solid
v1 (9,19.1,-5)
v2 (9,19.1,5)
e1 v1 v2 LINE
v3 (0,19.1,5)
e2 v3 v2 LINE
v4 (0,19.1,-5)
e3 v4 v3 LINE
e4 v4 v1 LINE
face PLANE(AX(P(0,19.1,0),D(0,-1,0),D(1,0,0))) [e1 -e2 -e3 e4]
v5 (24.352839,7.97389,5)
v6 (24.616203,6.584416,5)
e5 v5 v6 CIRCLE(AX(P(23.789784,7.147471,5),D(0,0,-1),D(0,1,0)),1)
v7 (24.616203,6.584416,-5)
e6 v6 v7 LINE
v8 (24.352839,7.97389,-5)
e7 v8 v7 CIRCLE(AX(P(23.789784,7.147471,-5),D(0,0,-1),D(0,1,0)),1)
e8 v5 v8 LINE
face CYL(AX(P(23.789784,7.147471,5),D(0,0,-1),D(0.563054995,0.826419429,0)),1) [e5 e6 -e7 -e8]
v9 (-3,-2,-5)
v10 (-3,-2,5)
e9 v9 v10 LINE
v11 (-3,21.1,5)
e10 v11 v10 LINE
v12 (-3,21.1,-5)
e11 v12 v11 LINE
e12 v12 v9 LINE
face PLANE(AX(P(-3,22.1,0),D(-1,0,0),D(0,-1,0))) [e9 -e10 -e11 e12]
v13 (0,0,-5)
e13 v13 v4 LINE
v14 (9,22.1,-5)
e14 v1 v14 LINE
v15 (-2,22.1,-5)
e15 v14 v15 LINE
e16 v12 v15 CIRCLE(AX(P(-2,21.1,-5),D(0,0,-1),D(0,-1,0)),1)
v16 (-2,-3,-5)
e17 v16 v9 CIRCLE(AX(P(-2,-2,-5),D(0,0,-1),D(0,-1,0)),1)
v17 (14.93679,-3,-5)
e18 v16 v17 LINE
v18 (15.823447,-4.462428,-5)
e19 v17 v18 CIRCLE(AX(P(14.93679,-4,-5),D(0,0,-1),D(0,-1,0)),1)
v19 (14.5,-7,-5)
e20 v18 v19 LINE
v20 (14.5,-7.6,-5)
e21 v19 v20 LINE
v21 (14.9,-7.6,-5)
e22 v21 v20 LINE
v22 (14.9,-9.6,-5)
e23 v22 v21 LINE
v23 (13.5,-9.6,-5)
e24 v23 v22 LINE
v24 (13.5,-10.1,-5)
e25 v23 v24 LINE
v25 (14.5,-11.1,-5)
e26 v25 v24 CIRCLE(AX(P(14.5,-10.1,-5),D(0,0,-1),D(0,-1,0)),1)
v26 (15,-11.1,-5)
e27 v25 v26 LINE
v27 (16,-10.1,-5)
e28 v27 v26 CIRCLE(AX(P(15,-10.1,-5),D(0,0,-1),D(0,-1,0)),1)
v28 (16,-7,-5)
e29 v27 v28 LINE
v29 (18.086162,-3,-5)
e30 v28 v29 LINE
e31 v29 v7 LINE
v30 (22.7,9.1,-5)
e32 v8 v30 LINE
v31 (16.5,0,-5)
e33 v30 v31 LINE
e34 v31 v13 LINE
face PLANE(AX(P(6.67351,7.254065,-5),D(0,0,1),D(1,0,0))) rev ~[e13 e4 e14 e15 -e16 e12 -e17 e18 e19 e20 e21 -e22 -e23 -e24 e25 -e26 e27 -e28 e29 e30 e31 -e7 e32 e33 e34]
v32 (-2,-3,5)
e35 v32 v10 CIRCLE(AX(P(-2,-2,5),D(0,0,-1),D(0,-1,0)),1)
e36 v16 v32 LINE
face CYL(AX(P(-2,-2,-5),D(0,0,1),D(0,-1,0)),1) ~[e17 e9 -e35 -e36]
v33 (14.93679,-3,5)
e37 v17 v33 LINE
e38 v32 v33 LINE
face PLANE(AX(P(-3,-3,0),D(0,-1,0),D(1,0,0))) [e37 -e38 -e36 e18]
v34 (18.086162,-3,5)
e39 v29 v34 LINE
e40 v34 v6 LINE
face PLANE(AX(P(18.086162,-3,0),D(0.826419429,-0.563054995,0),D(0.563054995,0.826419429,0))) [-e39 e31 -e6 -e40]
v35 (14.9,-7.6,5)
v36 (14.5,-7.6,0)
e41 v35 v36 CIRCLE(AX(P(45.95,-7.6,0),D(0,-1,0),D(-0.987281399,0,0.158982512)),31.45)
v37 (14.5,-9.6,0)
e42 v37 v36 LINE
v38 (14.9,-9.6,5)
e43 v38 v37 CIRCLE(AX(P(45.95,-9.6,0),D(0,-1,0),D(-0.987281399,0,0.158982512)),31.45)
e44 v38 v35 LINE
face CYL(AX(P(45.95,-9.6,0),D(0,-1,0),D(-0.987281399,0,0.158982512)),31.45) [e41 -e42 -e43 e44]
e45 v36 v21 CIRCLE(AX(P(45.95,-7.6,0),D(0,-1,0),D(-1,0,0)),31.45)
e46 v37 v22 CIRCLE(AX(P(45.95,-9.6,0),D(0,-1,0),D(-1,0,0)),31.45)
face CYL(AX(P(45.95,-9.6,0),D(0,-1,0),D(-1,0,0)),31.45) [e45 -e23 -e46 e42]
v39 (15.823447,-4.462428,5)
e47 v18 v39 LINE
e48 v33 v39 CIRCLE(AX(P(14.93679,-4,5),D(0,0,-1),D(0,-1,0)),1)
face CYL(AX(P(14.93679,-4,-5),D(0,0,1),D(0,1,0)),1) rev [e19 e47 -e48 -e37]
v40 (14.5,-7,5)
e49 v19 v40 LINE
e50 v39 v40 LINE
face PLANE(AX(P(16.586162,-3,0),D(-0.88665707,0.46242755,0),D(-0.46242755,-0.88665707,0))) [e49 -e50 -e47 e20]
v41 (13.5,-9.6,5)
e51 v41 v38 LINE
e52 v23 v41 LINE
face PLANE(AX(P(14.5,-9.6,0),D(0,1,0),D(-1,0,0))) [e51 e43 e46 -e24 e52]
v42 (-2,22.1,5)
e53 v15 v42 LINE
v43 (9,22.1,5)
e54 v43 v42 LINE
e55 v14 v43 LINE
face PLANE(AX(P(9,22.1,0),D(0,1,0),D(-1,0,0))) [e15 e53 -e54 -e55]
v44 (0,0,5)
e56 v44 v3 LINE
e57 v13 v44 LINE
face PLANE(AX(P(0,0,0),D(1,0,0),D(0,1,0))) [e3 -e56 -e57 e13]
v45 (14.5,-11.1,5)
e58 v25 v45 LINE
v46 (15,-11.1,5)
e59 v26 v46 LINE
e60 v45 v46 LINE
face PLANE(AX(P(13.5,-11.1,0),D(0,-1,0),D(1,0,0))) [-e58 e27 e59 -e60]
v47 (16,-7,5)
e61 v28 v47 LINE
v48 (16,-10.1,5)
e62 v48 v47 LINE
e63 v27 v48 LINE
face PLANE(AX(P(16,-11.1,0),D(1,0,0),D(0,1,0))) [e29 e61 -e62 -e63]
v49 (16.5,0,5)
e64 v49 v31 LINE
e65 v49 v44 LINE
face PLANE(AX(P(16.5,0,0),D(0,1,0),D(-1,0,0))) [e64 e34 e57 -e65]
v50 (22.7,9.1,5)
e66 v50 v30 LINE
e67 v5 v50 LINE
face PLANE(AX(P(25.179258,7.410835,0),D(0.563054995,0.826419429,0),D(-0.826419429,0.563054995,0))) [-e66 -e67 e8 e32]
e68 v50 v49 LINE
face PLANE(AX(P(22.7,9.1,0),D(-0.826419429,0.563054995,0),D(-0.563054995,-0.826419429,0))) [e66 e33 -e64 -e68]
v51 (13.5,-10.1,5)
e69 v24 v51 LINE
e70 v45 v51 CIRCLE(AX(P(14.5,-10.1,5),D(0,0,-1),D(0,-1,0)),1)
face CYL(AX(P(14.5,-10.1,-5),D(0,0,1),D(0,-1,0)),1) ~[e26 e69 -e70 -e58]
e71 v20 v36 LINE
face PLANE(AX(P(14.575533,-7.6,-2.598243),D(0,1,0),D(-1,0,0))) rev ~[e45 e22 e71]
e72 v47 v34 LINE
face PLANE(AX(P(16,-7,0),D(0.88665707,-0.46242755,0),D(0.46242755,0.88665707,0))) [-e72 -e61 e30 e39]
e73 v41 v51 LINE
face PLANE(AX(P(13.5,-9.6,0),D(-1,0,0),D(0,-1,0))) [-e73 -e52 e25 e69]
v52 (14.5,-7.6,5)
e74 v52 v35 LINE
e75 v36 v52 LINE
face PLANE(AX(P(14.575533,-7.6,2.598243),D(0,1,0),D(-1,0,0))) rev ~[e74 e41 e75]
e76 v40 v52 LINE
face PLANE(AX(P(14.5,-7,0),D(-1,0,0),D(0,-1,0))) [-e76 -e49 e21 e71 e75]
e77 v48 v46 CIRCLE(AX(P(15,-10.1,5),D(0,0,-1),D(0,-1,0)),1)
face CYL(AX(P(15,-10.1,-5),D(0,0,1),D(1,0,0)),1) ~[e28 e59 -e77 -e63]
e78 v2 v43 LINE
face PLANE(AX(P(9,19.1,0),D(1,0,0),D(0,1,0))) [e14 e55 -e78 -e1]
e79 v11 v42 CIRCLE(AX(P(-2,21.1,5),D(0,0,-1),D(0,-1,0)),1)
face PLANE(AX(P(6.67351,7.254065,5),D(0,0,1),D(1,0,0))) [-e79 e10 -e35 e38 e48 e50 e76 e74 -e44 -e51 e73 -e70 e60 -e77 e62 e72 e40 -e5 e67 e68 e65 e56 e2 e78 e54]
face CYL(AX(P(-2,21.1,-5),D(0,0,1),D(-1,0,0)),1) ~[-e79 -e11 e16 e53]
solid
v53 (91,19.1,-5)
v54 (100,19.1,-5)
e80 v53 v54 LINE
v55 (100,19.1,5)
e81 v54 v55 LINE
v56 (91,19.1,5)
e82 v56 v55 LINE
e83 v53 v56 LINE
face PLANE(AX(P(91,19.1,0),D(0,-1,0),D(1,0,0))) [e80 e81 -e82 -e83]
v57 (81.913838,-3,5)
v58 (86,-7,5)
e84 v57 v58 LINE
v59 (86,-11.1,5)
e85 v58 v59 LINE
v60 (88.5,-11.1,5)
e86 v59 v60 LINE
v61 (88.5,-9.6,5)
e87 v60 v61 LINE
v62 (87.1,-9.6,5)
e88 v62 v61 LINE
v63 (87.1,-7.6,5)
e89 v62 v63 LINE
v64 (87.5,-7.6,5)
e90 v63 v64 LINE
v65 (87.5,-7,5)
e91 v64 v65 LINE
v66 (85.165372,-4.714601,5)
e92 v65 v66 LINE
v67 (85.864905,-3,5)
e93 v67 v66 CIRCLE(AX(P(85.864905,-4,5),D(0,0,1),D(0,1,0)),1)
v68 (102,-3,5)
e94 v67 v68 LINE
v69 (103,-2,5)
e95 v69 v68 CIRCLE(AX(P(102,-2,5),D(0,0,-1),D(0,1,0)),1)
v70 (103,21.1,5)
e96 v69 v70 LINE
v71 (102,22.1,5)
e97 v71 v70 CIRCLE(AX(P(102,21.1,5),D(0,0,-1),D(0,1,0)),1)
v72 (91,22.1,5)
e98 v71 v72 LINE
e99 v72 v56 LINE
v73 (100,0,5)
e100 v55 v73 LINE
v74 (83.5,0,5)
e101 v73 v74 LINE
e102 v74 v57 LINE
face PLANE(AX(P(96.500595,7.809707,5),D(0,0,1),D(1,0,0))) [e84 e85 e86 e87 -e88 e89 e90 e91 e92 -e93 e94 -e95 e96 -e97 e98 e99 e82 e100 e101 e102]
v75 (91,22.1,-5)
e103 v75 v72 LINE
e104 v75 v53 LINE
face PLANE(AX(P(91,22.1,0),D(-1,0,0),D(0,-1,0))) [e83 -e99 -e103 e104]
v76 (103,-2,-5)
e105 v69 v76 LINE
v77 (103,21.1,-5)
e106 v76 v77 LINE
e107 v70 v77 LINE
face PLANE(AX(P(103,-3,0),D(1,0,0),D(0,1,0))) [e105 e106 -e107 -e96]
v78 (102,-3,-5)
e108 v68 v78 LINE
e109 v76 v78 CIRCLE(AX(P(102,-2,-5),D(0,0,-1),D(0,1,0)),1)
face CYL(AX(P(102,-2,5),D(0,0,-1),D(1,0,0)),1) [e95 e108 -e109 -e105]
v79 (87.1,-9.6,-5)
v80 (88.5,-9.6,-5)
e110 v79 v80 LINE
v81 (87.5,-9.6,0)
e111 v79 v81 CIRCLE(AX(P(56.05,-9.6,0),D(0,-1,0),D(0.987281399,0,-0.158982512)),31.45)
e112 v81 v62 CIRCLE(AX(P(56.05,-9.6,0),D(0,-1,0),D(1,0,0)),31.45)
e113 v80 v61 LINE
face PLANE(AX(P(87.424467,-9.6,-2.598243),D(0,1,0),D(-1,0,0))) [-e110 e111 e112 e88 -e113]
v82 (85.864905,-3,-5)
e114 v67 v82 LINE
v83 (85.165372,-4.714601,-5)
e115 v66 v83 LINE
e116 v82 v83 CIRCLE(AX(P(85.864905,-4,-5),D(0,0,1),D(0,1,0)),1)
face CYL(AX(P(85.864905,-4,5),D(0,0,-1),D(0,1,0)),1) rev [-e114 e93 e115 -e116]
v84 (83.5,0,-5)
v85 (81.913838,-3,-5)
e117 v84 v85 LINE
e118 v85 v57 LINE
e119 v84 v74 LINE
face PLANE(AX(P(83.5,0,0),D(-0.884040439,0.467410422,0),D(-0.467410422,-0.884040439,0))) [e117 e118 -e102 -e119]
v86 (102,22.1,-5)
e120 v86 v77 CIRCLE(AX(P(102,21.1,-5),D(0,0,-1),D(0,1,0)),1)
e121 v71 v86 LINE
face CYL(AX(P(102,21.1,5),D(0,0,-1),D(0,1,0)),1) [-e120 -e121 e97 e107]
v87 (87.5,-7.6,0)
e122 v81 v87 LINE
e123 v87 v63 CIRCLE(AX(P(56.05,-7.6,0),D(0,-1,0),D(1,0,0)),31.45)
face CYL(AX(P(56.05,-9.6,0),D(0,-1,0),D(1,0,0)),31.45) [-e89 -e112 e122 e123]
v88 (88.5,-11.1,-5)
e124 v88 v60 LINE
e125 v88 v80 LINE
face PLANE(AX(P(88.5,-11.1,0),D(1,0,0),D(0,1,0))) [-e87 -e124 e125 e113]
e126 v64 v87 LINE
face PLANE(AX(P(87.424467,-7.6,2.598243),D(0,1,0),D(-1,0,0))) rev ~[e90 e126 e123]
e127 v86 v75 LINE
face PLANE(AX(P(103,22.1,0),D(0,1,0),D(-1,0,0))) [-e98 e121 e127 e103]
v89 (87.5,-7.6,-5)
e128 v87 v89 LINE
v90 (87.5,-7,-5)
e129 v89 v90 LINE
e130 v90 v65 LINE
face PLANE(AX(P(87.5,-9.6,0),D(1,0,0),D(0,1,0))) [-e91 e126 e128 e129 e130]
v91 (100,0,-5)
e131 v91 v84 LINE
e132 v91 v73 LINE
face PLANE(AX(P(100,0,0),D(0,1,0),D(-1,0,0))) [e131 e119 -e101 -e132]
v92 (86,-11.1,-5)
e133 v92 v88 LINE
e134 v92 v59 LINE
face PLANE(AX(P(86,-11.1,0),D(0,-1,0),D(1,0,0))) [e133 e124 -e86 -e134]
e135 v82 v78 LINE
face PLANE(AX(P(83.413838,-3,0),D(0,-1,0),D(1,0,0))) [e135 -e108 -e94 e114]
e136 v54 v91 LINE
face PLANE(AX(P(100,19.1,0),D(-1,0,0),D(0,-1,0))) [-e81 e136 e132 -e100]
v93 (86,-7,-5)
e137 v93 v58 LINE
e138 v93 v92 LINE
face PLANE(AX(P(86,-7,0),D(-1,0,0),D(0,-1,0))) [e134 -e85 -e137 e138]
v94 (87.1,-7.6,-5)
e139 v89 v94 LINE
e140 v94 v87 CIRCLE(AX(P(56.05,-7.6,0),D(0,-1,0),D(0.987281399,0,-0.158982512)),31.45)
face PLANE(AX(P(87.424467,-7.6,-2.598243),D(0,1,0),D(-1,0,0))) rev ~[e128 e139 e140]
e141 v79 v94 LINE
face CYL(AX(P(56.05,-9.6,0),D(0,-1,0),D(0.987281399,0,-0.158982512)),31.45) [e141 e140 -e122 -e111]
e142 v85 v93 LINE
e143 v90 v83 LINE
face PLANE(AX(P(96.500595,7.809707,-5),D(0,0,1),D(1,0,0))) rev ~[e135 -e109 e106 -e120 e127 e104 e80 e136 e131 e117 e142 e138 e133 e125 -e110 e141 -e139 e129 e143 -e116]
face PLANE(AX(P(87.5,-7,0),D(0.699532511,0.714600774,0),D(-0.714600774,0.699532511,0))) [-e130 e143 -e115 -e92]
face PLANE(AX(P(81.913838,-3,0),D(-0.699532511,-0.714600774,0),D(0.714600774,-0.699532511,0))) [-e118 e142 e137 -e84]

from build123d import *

# Parameters (mm, degrees)
F1_DEPTH = 5
F3_R     = 1
F3_2_R   = 1
F4_R     = 1
F4_2_R   = 1
F6_DEPTH = 2
F8_DEPTH = 2


# Not quite as in the source:
# - a feature names something its author has since deleted; it is built from what else it names


with BuildPart() as f1:
    # F0 (on Top) → F1 (new body, symmetric)
    with BuildSketch(Plane.XY):
        Polygon((103, 22.1), (91, 22.1), (91, 19.1), (100, 19.1), (100, 0), (83.5, 0), (81.9138380969, -3), (83.4138380969, -3), (103, -3), align=None)
        Polygon((87.5, -7), (83.4138380969, -3), (81.9138380969, -3), (86, -7), (86, -11.1), (88.5, -11.1), (88.5, -9.6), (87.5, -9.6), align=None)
    extrude(amount=F1_DEPTH, both=True)

    # F3
    f3_edges = [f1.edges().sort_by_distance(p)[0] for p in [
        (103, 22.1, 0),
        (103, -3, 0),
    ]]
    fillet(f3_edges, radius=F3_R)

    # F4
    f4_edges = [f1.edges().sort_by_distance(p)[0] for p in [
        (83.413838, -3, 0),
    ]]
    fillet(f4_edges, radius=F4_R)

    # F7 (on face) → F8 (cut)
    with BuildSketch(Plane(origin=(0, -9.6, 0), x_dir=(-1, 0, 0), z_dir=(0, 1, 0))):
        with BuildLine():
            ThreePointArc((-87.5, 0), (-87.39984051, 2.5079872408), (-87.1, 5))
            Line((-87.1, 5), (-87.5, 5))
            Line((-87.5, 5), (-87.5, 0))
        make_face()
        with BuildLine():
            ThreePointArc((-87.1, -5), (-87.39984051, -2.5079872408), (-87.5, 0))
            Line((-87.5, 0), (-87.5, -5))
            Line((-87.5, -5), (-87.1, -5))
        make_face()
    extrude(amount=F8_DEPTH, mode=Mode.SUBTRACT)


with BuildPart() as f1b:
    # F0 (on Top) → F1, piece 2 (new body, symmetric)
    with BuildSketch(Plane.XY):
        Polygon((16.5, 0), (0, 0), (0, 19.1), (9, 19.1), (9, 22.1), (-3, 22.1), (-3, -3), (16.5861619031, -3), (18.0861619031, -3), (25.1792582862, 7.4108350138), (22.7, 9.1), align=None)
        Polygon((16, -7), (18.0861619031, -3), (16.5861619031, -3), (14.5, -7), (14.5, -9.6), (13.5, -9.6), (13.5, -11.1), (16, -11.1), align=None)
    extrude(amount=F1_DEPTH, both=True)

    # F3#2
    f3_2_edges = [f1b.edges().sort_by_distance(p)[0] for p in [
        (13.5, -11.1, 0),
        (16, -11.1, 0),
        (25.179258, 7.410835, 0),
        (-3, -3, 0),
        (-3, 22.1, 0),
    ]]
    fillet(f3_2_edges, radius=F3_2_R)

    # F4#2
    f4_2_edges = [f1b.edges().sort_by_distance(p)[0] for p in [
        (16.586162, -3, 0),
    ]]
    fillet(f4_2_edges, radius=F4_2_R)

    # F5 (on face) → F6 (cut)
    with BuildSketch(Plane(origin=(0, -9.6, 0), x_dir=(-1, 0, 0), z_dir=(0, 1, 0))):
        with BuildLine():
            ThreePointArc((-14.9, 5), (-14.60015949, 2.5079872408), (-14.5, 0))
            Line((-14.5, 0), (-14.5, 5))
            Line((-14.5, 5), (-14.9, 5))
        make_face()
        with BuildLine():
            ThreePointArc((-14.5, 0), (-14.60015949, -2.5079872408), (-14.9, -5))
            Line((-14.9, -5), (-14.5, -5))
            Line((-14.5, -5), (-14.5, 0))
        make_face()
    extrude(amount=F6_DEPTH, mode=Mode.SUBTRACT)


solid = Compound([f1.part, f1b.part])
